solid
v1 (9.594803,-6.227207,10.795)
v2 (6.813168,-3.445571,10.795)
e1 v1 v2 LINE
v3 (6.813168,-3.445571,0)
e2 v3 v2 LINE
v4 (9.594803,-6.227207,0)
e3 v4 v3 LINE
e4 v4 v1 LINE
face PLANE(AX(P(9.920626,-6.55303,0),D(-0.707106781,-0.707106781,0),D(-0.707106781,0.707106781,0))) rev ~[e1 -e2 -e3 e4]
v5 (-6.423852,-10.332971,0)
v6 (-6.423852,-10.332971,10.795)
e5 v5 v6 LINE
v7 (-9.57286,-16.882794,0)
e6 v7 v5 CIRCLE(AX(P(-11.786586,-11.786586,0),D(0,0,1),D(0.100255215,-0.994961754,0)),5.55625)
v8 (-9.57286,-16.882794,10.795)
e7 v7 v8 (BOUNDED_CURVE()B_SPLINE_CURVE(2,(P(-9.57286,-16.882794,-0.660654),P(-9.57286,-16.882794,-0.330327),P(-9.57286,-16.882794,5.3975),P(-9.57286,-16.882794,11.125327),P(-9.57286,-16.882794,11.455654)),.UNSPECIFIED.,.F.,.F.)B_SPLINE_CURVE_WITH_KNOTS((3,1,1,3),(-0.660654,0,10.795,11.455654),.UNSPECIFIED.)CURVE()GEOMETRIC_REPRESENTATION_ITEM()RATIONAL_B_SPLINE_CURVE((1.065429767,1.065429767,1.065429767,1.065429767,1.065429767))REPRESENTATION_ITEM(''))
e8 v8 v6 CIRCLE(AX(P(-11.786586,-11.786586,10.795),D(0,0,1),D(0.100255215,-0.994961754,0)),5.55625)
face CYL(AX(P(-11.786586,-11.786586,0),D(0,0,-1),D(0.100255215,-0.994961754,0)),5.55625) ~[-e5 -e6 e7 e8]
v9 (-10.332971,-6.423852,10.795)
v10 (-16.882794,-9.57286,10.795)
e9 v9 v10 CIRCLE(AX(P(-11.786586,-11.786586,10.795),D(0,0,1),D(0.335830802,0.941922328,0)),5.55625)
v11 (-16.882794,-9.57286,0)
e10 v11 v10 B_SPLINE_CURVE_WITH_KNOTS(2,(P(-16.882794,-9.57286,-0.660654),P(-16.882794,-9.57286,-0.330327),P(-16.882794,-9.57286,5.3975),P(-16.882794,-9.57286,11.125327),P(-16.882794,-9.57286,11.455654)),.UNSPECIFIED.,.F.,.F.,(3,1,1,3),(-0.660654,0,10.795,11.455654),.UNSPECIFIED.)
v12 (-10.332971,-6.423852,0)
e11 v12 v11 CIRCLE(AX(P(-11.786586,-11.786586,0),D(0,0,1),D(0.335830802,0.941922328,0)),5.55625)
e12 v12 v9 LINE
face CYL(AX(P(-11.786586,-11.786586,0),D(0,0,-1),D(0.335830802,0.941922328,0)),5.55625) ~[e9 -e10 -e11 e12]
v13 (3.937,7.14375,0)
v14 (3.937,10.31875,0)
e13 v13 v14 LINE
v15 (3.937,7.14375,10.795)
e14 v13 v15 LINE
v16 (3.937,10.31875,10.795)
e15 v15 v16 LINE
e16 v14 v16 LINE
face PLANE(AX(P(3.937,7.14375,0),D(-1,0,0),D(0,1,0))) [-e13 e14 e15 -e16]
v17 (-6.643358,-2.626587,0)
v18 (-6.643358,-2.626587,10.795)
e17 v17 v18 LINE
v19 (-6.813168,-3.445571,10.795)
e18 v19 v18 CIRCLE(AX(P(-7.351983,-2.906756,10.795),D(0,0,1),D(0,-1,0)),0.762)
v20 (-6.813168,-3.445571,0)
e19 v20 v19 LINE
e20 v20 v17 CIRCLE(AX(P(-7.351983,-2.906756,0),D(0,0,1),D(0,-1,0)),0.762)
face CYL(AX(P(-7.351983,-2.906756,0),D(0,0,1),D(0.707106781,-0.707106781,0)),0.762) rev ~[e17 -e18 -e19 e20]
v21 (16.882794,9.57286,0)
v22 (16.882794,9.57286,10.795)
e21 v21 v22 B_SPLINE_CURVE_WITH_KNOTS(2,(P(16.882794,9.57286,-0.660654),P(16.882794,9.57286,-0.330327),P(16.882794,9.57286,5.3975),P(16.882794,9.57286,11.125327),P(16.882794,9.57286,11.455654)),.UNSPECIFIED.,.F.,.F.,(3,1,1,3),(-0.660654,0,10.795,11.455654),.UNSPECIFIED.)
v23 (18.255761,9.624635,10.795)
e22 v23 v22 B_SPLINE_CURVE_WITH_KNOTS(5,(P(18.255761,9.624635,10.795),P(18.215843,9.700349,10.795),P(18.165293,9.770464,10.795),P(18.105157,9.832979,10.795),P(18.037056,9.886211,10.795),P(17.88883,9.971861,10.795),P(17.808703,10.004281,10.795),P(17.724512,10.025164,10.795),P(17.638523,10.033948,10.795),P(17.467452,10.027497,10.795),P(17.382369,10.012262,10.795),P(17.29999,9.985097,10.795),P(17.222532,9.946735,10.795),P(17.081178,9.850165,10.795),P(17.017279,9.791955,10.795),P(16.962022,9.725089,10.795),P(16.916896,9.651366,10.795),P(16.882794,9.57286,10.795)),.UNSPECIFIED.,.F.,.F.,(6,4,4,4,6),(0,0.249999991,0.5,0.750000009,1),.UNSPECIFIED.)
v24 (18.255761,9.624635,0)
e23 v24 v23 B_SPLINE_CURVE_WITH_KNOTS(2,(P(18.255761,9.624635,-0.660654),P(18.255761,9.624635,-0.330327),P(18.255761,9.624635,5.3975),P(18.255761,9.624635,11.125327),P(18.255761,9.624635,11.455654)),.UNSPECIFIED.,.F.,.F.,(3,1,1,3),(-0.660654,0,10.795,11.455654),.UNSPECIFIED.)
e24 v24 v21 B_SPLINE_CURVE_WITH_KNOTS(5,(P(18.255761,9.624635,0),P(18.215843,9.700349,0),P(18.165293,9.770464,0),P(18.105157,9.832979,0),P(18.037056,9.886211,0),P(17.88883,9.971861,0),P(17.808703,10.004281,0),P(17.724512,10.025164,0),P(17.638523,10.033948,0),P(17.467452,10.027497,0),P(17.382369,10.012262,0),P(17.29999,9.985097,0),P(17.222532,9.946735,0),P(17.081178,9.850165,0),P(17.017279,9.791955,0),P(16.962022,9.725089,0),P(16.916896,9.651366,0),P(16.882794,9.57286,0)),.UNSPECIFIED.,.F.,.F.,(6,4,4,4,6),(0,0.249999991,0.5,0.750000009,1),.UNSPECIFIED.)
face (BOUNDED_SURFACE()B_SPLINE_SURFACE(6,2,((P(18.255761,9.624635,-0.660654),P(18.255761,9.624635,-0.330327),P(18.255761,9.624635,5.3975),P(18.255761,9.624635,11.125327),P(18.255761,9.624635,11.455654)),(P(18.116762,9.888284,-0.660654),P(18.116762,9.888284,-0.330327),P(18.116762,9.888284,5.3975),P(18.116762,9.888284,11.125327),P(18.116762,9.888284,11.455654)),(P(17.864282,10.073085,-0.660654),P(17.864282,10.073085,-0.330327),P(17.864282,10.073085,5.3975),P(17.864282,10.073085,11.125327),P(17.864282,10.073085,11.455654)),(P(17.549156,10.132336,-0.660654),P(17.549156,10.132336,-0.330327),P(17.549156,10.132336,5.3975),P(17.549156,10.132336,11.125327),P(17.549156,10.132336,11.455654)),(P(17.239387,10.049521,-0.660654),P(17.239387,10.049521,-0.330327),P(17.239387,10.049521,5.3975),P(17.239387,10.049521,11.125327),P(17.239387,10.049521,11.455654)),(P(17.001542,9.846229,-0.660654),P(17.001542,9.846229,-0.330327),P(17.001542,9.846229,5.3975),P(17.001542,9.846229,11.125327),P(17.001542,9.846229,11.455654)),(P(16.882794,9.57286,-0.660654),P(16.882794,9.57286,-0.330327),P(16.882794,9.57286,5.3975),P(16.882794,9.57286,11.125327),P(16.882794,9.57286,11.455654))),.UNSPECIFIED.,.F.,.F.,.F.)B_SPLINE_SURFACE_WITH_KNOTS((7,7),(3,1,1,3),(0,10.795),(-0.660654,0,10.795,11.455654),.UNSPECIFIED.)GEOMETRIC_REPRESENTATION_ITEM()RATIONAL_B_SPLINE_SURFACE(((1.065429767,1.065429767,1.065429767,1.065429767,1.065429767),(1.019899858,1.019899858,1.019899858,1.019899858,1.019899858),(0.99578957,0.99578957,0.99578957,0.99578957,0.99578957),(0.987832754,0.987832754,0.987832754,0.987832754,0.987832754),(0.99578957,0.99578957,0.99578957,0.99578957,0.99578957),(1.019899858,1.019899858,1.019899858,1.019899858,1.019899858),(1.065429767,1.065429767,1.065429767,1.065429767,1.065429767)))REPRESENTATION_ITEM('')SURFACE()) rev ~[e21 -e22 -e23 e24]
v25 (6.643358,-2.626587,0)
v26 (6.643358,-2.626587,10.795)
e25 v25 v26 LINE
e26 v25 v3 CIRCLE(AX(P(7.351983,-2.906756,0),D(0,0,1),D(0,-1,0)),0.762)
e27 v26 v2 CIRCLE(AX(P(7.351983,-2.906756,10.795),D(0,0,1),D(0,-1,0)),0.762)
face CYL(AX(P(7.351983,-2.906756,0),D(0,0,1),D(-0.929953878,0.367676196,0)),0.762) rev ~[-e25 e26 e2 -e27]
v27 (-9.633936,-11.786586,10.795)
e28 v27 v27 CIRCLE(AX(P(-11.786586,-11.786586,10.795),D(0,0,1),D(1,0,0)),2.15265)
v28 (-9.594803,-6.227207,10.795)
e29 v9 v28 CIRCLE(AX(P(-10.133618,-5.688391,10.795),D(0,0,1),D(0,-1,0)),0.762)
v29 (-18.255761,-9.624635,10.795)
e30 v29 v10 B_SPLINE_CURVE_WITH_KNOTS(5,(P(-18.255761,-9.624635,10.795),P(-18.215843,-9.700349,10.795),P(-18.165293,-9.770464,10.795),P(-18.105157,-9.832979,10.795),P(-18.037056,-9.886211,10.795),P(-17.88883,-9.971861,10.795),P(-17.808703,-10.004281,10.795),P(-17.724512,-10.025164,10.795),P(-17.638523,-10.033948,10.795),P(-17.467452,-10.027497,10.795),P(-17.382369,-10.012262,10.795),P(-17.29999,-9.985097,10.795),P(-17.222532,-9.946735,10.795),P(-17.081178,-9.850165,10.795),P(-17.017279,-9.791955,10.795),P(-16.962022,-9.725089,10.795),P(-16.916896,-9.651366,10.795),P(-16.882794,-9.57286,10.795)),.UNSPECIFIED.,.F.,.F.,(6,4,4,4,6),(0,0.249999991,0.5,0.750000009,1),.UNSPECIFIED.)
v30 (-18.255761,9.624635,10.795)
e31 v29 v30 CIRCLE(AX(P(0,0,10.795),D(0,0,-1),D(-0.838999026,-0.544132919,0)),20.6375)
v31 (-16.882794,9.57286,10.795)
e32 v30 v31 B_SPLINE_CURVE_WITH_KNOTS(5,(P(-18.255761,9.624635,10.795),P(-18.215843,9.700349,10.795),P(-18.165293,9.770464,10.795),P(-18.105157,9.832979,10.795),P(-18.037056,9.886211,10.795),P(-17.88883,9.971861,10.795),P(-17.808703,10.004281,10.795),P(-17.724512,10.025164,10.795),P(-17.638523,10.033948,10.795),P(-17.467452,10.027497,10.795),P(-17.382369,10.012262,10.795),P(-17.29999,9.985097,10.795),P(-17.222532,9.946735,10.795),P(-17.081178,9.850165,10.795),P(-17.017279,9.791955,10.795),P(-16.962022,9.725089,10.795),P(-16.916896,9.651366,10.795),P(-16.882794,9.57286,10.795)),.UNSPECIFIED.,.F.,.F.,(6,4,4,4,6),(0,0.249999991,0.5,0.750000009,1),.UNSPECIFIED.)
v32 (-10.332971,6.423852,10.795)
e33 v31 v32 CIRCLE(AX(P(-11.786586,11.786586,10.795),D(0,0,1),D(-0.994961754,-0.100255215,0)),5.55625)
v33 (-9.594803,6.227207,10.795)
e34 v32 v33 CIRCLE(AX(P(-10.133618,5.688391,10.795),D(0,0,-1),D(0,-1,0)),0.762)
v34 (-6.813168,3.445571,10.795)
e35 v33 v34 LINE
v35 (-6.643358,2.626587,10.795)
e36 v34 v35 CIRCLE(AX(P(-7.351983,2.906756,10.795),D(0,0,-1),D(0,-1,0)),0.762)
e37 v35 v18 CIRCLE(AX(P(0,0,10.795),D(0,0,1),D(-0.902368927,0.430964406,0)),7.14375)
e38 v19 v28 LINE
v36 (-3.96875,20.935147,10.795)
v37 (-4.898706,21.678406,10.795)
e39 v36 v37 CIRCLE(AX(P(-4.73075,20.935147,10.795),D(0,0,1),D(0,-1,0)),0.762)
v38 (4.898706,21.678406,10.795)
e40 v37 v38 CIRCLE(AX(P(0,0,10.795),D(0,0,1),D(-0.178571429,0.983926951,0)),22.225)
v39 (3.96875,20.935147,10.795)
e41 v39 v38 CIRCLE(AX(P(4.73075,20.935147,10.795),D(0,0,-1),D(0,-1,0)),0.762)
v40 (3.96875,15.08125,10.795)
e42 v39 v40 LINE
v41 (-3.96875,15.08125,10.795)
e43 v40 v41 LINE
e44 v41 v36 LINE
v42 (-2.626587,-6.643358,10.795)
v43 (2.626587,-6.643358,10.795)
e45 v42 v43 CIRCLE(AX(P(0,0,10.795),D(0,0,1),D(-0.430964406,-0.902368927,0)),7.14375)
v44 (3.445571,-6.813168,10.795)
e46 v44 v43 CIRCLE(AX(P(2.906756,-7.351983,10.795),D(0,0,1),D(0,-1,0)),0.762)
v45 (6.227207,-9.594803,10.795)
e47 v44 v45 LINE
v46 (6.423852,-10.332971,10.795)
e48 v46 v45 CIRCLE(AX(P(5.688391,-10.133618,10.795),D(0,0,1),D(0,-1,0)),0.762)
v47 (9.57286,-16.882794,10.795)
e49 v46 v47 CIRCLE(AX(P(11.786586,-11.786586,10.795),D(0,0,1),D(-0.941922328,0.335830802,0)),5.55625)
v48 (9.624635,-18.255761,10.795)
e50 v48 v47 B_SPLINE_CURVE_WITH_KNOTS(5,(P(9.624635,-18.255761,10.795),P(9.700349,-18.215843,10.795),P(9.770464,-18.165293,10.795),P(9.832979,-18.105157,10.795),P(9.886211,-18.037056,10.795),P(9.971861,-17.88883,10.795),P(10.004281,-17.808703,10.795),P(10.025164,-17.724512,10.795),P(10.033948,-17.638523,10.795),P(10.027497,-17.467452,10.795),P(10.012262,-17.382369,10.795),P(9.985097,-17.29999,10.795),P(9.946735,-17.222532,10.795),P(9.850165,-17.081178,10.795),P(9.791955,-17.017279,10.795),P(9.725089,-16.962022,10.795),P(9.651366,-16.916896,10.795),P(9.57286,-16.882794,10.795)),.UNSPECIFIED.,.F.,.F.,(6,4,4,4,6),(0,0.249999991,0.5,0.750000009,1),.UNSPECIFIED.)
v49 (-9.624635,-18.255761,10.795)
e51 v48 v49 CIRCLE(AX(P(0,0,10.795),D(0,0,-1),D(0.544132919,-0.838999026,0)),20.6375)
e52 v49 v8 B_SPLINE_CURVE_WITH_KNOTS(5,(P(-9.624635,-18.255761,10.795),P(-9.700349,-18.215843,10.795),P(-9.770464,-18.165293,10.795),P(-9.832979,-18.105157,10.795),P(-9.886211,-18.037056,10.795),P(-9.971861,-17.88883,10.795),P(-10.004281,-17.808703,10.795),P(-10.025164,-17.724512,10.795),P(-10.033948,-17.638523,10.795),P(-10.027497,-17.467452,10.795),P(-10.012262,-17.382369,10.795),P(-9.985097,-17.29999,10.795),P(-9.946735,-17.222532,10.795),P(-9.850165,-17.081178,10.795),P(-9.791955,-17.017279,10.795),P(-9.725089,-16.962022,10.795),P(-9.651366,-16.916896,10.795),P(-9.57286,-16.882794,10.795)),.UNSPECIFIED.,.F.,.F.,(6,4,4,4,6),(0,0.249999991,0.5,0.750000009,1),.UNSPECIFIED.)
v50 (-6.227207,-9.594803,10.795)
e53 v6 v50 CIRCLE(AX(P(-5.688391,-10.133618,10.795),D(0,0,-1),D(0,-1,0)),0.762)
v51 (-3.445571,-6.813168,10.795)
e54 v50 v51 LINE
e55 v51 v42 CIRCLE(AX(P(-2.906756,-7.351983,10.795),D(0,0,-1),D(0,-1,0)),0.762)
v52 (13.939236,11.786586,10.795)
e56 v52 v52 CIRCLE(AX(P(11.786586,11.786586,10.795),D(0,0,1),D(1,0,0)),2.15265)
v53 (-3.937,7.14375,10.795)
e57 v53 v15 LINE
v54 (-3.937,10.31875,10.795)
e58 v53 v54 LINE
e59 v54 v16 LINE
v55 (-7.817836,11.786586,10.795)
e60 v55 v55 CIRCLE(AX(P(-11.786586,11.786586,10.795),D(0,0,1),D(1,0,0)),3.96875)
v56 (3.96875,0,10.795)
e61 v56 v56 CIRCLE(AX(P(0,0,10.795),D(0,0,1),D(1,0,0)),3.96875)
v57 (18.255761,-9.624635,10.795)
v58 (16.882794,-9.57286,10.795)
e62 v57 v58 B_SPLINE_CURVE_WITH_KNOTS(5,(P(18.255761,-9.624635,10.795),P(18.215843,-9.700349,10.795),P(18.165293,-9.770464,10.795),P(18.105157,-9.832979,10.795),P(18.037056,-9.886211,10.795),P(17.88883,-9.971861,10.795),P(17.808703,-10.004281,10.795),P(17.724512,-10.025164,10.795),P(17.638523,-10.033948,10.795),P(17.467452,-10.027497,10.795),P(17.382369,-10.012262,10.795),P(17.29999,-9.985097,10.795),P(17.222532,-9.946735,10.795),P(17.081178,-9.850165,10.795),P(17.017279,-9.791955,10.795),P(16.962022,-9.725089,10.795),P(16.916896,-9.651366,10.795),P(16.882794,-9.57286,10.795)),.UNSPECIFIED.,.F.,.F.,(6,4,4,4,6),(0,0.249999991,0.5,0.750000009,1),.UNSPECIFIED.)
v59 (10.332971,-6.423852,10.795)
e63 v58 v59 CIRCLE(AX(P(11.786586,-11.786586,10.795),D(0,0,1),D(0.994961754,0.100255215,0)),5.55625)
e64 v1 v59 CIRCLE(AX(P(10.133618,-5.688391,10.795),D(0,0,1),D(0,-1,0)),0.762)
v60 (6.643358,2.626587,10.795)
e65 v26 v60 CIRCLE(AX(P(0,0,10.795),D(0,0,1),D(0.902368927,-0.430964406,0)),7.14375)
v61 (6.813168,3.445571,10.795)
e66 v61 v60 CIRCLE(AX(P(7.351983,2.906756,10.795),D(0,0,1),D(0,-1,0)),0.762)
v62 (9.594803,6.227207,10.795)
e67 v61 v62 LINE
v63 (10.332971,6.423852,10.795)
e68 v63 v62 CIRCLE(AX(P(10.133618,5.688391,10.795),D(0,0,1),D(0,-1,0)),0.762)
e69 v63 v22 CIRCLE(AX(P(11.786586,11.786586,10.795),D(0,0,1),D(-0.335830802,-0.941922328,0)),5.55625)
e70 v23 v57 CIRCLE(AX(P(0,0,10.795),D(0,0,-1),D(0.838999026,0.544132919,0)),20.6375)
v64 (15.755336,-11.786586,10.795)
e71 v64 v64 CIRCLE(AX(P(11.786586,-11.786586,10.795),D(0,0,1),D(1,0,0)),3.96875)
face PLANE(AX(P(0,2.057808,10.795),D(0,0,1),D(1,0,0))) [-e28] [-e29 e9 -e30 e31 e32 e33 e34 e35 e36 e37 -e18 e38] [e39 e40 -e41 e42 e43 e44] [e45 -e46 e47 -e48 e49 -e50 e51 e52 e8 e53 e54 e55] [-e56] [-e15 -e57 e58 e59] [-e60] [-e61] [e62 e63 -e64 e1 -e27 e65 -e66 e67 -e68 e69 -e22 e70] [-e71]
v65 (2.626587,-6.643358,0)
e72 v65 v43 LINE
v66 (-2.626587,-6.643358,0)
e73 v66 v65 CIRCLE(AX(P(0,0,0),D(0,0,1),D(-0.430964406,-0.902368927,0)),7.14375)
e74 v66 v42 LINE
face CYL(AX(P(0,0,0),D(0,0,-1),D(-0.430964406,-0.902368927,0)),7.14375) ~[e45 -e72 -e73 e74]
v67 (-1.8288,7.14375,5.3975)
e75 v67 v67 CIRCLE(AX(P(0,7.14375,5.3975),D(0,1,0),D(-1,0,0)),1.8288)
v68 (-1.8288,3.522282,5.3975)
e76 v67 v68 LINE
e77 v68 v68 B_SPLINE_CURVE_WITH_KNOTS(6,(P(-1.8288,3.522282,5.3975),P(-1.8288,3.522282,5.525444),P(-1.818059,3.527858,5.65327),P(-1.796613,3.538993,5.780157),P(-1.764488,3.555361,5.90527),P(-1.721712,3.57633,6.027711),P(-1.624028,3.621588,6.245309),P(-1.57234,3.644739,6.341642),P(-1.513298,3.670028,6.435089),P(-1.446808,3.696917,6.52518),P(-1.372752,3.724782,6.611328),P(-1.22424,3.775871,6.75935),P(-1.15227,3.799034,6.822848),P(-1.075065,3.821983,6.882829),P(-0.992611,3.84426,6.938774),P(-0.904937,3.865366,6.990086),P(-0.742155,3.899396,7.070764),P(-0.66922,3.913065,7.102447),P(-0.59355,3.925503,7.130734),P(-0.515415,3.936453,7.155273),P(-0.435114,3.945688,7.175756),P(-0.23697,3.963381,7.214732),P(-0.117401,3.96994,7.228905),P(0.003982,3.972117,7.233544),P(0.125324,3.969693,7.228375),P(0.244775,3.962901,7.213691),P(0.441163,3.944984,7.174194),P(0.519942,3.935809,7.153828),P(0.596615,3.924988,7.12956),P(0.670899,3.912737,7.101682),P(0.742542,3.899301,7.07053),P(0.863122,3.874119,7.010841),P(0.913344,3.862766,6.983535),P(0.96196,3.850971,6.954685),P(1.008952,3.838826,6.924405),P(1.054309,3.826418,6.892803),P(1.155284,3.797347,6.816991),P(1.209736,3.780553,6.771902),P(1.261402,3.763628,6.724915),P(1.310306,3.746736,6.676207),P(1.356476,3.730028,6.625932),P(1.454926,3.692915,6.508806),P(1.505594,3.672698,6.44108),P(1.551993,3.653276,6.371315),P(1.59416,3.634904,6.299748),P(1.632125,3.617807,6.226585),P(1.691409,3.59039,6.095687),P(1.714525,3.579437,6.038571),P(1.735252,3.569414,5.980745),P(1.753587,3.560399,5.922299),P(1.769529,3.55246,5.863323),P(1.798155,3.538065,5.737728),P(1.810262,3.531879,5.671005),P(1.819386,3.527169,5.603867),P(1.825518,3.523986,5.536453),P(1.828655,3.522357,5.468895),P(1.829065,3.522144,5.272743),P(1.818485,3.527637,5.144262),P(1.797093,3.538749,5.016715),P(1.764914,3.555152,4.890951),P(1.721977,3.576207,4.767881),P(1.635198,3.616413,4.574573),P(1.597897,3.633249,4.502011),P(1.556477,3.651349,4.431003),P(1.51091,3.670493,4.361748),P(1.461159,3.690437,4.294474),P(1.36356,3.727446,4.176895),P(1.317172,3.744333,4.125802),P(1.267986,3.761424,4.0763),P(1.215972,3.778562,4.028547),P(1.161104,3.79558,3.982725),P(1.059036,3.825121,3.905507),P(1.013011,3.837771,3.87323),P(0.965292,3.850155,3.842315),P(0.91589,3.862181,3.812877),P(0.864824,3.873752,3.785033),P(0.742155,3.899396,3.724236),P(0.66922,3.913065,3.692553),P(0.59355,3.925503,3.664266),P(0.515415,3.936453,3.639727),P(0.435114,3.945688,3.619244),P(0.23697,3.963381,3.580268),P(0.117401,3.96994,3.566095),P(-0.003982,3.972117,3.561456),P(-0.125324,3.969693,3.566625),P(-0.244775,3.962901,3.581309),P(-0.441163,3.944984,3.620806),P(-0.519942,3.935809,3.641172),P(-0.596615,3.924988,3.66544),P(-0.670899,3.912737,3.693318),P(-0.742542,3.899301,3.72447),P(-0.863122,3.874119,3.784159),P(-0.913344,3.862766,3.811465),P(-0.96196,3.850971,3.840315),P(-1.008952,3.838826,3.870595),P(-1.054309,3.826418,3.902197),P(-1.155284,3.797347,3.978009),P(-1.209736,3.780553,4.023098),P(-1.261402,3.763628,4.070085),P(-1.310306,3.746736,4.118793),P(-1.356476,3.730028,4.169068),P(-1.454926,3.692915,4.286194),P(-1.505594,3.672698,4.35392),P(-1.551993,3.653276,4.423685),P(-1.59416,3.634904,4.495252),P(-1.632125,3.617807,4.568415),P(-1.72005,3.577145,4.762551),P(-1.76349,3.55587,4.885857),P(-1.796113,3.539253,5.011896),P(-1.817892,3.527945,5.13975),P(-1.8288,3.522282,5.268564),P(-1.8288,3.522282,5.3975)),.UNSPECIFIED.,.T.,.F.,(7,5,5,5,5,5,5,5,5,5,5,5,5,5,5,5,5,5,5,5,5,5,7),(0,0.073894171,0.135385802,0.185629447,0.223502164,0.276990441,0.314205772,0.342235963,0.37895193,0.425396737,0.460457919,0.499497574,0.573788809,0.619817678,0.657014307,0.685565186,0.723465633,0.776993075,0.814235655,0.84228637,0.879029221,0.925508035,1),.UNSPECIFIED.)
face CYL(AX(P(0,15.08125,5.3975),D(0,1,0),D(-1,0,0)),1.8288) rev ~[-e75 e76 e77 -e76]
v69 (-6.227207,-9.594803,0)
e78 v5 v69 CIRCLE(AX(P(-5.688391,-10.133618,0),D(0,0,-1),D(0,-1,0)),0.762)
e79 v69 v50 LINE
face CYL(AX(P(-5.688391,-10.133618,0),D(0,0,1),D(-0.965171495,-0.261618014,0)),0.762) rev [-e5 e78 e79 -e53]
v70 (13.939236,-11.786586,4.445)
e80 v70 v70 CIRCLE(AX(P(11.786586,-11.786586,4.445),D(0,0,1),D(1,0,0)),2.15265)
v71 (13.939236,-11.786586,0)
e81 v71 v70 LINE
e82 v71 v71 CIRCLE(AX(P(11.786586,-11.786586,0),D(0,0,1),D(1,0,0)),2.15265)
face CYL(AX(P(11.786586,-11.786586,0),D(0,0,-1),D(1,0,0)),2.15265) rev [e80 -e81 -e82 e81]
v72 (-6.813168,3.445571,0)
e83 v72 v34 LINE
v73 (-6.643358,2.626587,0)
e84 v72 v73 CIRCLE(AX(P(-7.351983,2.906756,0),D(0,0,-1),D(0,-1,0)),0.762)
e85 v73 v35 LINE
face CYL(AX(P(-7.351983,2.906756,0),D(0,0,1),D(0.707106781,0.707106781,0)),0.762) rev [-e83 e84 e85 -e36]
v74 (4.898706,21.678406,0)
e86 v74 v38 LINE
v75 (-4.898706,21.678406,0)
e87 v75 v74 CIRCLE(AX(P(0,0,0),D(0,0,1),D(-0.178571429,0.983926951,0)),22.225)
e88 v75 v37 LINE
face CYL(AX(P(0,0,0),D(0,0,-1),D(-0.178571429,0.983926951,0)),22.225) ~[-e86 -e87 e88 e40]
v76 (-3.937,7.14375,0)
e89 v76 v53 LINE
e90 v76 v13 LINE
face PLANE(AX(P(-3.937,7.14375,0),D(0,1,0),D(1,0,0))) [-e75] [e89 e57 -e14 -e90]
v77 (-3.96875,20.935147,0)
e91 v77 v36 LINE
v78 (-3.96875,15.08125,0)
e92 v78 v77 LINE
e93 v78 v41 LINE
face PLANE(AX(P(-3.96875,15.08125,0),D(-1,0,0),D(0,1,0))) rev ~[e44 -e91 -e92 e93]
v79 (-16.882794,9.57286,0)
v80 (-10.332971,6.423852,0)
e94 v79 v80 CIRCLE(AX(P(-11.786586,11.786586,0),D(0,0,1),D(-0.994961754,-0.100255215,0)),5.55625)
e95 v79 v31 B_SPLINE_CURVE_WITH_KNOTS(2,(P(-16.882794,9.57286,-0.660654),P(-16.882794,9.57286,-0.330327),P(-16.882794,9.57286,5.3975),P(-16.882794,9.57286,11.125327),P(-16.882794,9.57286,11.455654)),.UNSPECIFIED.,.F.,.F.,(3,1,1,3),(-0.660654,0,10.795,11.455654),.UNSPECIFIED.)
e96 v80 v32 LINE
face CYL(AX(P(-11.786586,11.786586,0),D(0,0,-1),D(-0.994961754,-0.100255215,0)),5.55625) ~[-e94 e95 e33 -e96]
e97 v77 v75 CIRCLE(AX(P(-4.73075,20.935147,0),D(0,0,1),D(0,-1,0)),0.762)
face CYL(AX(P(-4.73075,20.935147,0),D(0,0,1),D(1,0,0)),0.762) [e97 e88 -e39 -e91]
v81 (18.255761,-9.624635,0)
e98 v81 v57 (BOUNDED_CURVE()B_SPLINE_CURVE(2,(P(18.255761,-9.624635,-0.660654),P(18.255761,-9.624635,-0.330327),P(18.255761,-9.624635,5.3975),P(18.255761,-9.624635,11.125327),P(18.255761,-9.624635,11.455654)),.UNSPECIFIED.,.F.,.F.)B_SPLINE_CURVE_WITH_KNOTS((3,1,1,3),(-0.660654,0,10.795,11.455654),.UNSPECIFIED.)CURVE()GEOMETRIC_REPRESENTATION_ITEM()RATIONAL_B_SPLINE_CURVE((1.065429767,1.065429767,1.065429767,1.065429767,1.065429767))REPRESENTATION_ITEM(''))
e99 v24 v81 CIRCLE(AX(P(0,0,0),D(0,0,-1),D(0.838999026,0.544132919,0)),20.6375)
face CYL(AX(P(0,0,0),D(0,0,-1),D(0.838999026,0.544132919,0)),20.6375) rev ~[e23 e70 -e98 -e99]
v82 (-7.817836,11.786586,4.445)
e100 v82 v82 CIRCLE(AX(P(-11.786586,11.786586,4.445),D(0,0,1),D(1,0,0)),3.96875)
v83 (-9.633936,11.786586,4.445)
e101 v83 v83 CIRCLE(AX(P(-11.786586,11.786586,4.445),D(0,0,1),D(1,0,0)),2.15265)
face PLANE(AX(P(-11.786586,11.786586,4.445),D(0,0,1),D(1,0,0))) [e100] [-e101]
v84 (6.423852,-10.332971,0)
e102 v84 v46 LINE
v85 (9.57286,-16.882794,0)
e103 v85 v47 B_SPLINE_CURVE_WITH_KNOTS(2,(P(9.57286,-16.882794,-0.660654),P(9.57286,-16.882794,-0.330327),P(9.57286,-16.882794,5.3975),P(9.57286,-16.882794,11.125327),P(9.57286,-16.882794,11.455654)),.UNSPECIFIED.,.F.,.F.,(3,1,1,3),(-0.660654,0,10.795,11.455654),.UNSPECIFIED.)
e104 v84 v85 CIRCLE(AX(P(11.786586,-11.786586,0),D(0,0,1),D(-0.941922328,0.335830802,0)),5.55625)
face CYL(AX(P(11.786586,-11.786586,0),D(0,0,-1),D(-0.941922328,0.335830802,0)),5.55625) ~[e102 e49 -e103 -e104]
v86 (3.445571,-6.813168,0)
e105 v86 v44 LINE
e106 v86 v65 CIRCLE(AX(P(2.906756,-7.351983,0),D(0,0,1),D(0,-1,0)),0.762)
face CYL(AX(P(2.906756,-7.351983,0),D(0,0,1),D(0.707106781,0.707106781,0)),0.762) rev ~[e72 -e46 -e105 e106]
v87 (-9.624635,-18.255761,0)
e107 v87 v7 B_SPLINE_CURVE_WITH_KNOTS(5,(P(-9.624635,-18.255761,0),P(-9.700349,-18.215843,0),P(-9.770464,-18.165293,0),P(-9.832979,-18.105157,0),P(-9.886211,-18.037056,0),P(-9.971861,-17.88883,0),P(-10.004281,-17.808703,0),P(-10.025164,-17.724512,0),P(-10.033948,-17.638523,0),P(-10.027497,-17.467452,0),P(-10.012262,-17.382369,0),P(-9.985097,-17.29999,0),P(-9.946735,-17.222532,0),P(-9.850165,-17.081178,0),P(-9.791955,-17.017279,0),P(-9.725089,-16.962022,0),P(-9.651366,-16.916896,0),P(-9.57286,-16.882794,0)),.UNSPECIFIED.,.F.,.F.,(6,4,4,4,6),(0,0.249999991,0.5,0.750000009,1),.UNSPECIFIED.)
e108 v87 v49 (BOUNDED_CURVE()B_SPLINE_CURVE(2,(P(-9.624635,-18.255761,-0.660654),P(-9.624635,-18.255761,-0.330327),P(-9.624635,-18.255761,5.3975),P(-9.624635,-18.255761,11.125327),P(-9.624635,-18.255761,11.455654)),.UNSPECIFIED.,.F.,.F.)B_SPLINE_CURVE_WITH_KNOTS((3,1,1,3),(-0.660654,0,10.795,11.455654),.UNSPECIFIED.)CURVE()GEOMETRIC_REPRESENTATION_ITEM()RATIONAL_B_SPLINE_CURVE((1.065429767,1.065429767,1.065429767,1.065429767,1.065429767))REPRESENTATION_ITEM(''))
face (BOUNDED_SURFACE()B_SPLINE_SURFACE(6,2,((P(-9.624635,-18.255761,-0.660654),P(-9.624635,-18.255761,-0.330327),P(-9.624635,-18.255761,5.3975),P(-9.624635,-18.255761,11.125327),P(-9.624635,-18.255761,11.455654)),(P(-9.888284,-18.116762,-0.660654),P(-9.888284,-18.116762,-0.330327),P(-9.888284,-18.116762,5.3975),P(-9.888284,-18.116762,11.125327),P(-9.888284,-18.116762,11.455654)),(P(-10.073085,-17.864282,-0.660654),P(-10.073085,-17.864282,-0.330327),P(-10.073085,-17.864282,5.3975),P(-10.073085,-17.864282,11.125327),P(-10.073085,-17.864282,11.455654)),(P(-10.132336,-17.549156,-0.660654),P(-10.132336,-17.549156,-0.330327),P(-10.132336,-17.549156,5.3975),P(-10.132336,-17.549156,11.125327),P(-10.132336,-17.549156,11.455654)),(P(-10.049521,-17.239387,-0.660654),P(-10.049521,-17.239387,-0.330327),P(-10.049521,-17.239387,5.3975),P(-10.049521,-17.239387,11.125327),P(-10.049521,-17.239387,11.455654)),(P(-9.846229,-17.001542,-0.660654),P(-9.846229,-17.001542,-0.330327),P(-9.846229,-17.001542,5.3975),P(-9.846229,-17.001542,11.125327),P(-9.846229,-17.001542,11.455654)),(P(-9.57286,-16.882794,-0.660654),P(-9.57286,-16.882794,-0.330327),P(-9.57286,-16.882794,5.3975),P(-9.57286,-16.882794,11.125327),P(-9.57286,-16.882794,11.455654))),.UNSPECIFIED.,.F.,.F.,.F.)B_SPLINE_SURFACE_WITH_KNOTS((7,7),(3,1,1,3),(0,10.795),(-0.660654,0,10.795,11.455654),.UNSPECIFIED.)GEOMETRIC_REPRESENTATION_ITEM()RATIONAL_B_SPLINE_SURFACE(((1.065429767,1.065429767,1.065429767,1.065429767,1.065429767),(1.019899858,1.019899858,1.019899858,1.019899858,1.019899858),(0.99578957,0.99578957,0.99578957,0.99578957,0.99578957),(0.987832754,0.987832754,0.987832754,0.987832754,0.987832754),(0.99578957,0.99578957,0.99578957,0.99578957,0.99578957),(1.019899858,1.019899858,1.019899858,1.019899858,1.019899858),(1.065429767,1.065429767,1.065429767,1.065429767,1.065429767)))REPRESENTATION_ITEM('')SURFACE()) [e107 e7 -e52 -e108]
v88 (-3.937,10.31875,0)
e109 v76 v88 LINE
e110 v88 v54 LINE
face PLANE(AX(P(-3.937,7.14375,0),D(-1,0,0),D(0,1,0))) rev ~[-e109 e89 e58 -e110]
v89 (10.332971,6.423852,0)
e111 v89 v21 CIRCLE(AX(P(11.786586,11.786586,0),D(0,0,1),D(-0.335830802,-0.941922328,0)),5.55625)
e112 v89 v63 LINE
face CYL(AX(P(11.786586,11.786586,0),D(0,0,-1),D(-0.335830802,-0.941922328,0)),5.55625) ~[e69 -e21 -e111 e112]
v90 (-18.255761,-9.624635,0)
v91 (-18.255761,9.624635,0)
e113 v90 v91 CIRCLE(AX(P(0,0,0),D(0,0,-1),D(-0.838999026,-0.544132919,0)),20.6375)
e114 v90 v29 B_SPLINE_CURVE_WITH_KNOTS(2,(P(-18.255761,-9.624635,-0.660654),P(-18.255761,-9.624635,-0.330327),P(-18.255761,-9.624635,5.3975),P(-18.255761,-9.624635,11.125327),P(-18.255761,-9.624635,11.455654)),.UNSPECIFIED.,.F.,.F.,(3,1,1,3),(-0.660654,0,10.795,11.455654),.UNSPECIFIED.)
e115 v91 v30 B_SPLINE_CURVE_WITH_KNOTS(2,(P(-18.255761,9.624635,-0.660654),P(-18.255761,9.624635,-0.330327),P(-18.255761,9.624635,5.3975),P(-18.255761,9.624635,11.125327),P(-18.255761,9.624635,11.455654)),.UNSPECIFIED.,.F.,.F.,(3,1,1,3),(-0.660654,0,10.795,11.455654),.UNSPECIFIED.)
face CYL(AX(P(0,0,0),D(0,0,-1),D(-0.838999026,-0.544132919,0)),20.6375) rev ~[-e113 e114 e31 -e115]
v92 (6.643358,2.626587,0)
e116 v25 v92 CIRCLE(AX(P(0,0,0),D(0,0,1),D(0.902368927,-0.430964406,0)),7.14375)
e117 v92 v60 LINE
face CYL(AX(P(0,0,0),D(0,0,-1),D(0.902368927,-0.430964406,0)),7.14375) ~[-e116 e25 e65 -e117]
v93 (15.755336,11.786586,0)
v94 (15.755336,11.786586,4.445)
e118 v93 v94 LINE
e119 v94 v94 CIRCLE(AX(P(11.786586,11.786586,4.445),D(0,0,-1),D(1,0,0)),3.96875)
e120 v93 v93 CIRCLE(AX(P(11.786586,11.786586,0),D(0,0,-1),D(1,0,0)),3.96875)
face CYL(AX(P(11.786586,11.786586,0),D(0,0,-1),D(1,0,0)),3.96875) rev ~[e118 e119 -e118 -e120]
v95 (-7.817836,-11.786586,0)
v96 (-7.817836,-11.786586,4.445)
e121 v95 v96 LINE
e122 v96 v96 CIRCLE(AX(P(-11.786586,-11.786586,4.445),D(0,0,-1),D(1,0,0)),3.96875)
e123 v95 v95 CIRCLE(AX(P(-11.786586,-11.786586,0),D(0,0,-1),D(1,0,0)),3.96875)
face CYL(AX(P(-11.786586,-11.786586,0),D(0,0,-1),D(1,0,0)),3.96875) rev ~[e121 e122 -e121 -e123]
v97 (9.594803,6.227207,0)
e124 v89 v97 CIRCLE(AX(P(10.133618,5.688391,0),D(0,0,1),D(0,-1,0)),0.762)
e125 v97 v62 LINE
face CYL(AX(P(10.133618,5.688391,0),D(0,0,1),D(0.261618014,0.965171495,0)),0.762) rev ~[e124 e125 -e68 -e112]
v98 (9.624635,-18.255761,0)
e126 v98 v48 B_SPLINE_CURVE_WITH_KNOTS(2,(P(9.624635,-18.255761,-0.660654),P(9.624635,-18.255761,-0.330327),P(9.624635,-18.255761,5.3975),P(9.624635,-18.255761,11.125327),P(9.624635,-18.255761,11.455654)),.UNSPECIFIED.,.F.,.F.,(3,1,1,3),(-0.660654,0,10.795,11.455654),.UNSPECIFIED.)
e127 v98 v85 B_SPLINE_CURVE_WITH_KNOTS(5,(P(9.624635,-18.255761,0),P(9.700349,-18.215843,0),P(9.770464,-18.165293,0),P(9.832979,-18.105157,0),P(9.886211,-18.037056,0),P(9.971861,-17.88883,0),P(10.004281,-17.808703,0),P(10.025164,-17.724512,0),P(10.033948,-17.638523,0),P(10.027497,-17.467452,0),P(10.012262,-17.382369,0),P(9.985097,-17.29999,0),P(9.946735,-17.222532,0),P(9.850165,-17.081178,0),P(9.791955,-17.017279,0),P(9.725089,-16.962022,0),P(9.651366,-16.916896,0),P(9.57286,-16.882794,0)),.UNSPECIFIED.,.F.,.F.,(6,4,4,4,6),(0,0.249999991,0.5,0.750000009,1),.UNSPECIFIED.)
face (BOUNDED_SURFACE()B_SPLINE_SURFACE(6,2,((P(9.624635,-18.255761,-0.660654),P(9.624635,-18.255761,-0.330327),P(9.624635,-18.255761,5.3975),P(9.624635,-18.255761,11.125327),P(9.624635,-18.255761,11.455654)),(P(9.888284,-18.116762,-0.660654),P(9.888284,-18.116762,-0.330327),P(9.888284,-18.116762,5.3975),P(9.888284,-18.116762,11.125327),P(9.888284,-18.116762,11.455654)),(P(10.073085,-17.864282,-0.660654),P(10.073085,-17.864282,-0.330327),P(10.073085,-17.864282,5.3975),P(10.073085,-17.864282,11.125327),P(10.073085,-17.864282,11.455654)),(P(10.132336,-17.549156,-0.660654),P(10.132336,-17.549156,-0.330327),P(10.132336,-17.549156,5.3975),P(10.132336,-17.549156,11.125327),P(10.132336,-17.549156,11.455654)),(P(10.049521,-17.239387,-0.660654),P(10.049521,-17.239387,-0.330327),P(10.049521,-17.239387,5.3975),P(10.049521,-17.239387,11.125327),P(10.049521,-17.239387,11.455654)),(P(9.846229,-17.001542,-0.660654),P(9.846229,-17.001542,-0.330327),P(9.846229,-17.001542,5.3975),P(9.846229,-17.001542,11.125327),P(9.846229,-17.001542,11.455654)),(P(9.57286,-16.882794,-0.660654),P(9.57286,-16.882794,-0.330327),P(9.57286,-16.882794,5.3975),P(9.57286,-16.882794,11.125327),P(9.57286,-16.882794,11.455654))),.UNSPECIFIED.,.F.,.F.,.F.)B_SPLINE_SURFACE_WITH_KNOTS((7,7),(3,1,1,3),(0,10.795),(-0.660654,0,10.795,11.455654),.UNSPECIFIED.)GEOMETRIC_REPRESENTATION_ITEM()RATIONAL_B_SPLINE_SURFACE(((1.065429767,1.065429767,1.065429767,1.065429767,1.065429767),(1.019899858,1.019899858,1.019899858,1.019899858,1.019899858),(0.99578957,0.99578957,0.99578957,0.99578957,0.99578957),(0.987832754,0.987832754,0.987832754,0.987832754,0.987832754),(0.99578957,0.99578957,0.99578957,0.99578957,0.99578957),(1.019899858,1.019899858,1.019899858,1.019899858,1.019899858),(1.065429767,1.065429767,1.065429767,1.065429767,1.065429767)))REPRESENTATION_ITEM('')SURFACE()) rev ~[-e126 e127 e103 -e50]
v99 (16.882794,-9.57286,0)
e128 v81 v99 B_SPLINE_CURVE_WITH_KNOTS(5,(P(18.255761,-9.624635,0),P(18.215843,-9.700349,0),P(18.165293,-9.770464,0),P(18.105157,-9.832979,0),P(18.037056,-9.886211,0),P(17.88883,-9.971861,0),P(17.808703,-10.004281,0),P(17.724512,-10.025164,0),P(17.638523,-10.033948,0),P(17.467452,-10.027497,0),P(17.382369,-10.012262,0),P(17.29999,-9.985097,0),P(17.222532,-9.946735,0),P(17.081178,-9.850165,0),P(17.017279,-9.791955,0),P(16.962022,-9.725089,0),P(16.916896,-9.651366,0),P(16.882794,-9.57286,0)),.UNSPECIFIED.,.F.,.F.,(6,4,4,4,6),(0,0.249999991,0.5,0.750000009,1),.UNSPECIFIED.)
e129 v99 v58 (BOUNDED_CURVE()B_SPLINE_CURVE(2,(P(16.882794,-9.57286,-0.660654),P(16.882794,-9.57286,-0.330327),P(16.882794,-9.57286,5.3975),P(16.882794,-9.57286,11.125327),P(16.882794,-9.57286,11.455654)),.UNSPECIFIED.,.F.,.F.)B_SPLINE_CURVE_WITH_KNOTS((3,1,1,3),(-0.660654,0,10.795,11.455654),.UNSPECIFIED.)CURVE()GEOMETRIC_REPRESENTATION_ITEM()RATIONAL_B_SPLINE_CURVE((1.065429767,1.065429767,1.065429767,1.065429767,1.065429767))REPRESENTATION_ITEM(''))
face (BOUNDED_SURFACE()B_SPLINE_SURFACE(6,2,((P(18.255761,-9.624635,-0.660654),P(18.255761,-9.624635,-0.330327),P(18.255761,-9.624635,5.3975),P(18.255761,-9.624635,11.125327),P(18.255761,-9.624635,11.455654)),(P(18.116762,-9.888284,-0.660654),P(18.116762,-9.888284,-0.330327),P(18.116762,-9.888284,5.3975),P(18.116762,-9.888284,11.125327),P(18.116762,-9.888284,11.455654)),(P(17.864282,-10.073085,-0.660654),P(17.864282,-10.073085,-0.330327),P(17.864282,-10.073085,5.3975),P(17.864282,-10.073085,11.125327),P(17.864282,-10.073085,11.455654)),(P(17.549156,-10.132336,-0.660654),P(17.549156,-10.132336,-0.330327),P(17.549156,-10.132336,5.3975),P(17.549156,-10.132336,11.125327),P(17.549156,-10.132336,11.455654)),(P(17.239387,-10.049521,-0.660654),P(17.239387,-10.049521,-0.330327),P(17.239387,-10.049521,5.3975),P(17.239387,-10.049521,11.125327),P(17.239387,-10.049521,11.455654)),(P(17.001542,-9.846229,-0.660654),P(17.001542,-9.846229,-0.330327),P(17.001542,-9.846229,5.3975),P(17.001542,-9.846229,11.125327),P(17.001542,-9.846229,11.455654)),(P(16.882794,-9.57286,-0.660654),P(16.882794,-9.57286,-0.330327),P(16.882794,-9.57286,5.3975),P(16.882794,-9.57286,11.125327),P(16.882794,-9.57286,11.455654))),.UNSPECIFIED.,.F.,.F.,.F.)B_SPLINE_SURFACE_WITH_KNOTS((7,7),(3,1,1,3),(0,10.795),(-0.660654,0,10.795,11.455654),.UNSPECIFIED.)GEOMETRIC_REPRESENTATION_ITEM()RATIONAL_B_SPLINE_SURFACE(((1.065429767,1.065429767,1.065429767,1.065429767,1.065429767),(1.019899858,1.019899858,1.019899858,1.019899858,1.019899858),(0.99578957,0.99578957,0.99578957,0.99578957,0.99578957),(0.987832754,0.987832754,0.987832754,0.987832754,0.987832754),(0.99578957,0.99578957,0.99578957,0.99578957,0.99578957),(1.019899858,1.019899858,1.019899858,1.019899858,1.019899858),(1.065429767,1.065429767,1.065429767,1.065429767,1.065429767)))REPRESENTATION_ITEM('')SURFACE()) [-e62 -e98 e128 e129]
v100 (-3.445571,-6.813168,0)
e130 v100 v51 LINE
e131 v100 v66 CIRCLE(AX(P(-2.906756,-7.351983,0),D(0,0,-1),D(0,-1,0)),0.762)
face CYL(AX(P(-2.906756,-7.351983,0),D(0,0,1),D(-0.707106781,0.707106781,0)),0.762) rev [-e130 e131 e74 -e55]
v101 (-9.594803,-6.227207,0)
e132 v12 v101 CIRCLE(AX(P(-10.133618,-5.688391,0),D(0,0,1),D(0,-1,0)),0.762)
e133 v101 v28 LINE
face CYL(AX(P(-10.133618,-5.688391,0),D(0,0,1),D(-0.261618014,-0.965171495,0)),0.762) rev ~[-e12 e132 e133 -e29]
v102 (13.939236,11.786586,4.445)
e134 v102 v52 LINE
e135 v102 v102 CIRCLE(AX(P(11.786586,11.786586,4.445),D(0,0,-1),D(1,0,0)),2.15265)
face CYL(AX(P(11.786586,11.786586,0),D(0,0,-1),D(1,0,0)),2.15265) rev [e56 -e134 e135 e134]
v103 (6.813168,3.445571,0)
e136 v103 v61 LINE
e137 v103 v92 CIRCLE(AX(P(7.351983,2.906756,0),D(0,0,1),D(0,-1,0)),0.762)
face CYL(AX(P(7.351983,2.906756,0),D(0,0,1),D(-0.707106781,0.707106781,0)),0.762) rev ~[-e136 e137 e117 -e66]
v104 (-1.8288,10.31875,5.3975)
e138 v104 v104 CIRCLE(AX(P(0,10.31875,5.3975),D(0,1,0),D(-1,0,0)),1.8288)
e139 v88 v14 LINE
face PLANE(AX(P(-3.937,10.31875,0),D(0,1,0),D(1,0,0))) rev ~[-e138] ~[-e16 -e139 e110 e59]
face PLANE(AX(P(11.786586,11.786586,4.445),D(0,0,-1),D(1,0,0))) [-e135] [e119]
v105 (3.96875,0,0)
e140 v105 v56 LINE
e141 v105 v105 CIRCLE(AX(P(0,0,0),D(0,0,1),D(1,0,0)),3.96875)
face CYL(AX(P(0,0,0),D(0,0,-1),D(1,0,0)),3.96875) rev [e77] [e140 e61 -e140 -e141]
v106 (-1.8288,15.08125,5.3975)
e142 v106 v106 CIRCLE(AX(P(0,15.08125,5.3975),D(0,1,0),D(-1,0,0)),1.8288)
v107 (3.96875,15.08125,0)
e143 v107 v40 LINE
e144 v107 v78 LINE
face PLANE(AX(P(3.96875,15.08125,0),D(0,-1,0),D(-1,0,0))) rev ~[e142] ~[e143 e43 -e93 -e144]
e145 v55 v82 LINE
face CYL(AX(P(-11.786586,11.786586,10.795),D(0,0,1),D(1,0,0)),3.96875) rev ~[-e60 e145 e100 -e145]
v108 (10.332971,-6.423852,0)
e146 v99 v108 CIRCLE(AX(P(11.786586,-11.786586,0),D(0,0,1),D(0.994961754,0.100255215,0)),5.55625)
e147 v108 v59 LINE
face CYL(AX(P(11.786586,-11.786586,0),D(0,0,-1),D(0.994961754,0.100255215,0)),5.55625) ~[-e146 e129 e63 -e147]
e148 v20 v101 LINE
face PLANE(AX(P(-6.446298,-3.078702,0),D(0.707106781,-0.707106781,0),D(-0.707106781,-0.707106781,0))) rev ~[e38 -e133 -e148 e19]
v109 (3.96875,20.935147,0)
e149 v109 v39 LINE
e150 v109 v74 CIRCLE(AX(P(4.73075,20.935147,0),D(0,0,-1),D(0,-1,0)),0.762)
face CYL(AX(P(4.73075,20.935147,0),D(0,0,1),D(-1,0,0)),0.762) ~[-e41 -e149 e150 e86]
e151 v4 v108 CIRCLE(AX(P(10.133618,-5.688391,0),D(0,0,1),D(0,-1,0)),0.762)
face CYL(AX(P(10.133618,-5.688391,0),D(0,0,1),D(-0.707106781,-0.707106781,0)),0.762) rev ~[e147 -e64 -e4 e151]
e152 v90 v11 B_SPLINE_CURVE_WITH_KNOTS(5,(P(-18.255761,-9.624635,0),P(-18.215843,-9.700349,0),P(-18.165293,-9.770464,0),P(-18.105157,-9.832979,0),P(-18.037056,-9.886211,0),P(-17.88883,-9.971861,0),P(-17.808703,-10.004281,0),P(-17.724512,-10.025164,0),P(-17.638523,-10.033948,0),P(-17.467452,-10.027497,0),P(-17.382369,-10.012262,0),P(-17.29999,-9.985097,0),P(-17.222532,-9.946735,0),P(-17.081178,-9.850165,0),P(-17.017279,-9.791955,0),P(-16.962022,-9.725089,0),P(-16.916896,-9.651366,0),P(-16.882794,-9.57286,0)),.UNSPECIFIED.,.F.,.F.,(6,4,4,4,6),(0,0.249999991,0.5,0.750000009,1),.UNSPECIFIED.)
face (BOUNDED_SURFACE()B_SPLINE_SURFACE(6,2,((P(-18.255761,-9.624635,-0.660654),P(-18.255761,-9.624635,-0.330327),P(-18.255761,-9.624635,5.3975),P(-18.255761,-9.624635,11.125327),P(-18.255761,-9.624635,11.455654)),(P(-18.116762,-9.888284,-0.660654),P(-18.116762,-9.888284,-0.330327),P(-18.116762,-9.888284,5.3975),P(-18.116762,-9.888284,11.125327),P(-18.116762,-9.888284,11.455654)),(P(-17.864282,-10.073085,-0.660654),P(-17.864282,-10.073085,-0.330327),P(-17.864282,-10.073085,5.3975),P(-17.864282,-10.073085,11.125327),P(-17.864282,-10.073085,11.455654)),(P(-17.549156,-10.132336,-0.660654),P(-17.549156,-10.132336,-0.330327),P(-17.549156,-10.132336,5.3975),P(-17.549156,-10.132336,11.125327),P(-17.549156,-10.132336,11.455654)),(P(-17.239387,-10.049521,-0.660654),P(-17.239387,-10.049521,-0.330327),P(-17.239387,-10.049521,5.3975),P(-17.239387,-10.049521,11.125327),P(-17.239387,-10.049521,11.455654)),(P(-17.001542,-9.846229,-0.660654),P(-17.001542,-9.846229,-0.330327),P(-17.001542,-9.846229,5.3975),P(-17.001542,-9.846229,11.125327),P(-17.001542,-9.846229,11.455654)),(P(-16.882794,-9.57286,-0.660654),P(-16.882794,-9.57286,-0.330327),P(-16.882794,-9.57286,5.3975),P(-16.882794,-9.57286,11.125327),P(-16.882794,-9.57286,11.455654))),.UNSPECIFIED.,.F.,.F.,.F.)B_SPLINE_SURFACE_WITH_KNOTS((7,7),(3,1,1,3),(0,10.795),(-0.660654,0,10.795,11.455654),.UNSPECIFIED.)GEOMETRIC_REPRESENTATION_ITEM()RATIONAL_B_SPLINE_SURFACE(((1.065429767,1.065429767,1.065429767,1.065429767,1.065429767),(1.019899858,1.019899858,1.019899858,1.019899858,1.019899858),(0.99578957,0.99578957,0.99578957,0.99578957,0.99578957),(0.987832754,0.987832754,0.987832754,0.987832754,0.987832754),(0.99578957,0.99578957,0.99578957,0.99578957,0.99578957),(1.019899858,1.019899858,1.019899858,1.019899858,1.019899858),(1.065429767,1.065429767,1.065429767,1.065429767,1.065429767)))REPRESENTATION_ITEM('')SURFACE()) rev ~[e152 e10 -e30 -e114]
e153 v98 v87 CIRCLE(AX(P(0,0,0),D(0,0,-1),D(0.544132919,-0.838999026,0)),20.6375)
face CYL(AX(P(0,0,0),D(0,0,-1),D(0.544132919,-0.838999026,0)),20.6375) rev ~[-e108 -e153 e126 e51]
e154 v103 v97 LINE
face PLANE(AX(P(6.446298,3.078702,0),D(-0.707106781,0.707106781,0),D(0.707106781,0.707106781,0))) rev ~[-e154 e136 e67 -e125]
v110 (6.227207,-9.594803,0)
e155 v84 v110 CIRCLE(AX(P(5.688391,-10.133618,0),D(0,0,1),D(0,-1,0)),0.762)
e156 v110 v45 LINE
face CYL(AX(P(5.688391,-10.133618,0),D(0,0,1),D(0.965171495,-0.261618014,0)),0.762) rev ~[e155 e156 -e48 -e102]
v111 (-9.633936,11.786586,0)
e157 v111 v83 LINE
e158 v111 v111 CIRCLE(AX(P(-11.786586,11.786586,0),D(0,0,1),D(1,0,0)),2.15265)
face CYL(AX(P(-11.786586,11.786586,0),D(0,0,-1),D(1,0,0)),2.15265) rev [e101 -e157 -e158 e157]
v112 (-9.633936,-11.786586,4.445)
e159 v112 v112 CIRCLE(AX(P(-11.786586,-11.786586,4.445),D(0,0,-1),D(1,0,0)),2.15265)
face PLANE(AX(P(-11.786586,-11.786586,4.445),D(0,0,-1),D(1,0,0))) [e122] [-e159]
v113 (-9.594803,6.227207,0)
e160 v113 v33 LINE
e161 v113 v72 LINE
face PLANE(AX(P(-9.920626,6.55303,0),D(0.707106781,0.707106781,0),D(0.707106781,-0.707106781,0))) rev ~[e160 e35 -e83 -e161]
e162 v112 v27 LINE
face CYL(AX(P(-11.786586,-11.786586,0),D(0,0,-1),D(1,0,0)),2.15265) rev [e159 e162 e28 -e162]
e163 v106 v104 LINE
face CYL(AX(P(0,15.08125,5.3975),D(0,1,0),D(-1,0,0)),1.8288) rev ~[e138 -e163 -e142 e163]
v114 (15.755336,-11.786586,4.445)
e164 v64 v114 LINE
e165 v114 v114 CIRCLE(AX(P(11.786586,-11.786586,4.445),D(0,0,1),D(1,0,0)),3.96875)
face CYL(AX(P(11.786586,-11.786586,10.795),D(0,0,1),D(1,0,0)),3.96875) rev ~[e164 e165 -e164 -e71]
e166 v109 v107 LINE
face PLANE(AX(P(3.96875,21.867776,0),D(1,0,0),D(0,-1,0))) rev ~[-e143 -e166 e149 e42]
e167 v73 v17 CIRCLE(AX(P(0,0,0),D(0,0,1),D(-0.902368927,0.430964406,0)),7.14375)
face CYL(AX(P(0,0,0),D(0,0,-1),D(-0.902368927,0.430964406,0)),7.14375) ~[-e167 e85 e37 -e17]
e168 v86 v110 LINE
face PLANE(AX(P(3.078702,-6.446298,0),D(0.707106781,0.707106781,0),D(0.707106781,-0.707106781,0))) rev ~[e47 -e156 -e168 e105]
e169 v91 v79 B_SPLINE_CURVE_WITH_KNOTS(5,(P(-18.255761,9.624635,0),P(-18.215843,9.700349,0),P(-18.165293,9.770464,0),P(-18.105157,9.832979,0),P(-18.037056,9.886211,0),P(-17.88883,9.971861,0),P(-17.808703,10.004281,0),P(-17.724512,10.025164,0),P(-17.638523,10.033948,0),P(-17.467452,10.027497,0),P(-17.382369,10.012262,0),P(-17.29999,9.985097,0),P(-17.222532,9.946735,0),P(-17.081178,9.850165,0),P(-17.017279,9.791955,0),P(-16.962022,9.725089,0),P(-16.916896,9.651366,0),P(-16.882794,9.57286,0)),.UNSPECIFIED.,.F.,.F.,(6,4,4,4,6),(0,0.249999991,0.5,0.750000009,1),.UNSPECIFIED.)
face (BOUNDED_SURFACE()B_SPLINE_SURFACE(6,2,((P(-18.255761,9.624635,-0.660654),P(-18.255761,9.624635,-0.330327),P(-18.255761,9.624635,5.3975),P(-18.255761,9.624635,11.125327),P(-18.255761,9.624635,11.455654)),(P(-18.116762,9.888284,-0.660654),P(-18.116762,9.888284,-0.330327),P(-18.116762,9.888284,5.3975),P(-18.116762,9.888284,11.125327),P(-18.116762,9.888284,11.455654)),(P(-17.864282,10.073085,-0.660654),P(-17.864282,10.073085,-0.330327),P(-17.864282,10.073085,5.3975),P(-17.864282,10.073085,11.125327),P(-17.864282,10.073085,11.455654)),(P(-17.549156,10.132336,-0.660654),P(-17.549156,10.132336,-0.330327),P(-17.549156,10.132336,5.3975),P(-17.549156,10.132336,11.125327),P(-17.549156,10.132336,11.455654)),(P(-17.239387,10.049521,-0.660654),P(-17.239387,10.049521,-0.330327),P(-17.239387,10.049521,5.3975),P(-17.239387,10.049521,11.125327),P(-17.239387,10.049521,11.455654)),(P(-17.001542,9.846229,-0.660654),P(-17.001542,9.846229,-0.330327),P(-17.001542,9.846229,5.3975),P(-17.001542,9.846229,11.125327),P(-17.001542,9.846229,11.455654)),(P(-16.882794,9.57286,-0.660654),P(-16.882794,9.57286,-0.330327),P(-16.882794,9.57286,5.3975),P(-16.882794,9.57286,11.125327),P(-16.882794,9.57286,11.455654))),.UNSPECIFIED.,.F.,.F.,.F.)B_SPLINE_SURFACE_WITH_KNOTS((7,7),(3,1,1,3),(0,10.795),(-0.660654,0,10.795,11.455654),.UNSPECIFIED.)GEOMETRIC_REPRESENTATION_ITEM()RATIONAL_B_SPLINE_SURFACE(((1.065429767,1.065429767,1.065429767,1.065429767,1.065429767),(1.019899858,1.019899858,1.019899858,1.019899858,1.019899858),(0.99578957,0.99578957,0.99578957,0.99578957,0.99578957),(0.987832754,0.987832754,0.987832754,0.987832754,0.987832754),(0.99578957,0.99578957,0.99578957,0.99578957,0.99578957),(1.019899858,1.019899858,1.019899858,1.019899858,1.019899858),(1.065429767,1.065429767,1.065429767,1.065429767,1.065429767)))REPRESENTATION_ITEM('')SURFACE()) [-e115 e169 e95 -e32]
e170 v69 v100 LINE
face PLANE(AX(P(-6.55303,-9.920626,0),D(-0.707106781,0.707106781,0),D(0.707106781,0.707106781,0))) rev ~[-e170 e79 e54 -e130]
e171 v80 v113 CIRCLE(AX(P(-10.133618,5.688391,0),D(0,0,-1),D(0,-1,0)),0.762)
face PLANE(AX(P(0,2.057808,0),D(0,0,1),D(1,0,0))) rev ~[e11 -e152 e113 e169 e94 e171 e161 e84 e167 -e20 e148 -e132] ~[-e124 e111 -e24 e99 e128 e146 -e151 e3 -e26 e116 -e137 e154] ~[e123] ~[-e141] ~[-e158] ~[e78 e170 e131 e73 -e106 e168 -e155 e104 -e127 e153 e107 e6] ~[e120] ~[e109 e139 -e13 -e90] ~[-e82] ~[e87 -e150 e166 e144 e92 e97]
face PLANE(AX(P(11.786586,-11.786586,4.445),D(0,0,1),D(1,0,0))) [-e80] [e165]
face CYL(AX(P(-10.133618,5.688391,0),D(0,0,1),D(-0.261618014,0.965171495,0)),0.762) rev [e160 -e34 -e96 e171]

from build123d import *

# Parameters (mm, degrees)
F0_R            = 2.15265
F0_R_2          = 3.96875
F0_W            = 7.874
F0_H            = 3.175
F1_DEPTH        = 10.795
F2_R            = 1.8288
F3_REACH        = 42.4798775257
F5_R            = 3.96875
F6_DEPTH        = 4.445
F8_DEPTH        = 10.795
F8_COPIES_COUNT = 3
F8_COPIES_ANGLE = 180
F9_R            = 0.762
F11_R           = 3.96875
F11_R_2         = 2.15265
F13_DEPTH       = 6.35


# Not quite as in the source:
# - a feature of the source that left no trace in its solid (it failed there, or was rolled back) is left out
# - a pattern or mirror of a feature is missing from the dataset's text; its kind, count and spacing are read off the source's solid


with BuildPart() as f1:
    # F0 (on Top) → F1 (new body)
    with BuildSketch(Plane.XY):
        with BuildLine():
            Line((3.96875, 15.08125), (-3.96875, 15.08125))
            Line((-3.96875, 15.08125), (-3.96875, 21.8677764859))
            ThreePointArc((-3.96875, 21.8677764859), (0, -22.225), (3.96875, 21.8677764859))
            Line((3.96875, 21.8677764859), (3.96875, 15.08125))
        make_face()
        with Locations((-11.7865861589, -11.7865861589)):
            Circle(F0_R, mode=Mode.SUBTRACT)
        with Locations((11.7865861589, -11.7865861589)):
            Circle(F0_R, mode=Mode.SUBTRACT)
        with Locations((-11.7865861589, 11.7865861589)):
            Circle(F0_R, mode=Mode.SUBTRACT)
        Circle(F0_R_2, mode=Mode.SUBTRACT)
        with Locations((0, 8.73125)):
            Rectangle(F0_W, F0_H, mode=Mode.SUBTRACT)
        with Locations((11.7865861589, 11.7865861589)):
            Circle(F0_R, mode=Mode.SUBTRACT)
    extrude(amount=F1_DEPTH)

    f3_end = f1.faces().sort_by_distance((-3.96875, 0, 5.3975))[0]
    # F2 (on face) → F3 (cut, up to a face of the model that its end follows)
    with BuildSketch(Plane(origin=(0, 15.08125, 0), x_dir=(-1, 0, 0), z_dir=(0, 1, 0))):
        with Locations((0, 5.3975)):
            Circle(F2_R)
    f3_long = extrude(amount=-F3_REACH, mode=Mode.PRIVATE)
    add(split(f3_long, bisect_by=f3_end, keep=Keep.ALL, mode=Mode.PRIVATE).solids().sort_by_distance((0, 15.08125, 5.3975))[0], mode=Mode.SUBTRACT)

    # F5 (on face) → F6 (cut, through all)
    with BuildSketch(Plane(origin=(0, 0, 0), x_dir=(1, 0, 0), z_dir=(0, 0, -1))):
        with Locations((11.7865861589, -11.7865861589)):
            Circle(F5_R)
        with Locations((-11.7865861589, 11.7865861589)):
            Circle(F5_R)
    extrude(amount=-F6_DEPTH, mode=Mode.SUBTRACT)

    # F7 (on face) → F8 (cut, through all)
    with BuildSketch(Plane(origin=(0, 0, 0), x_dir=(1, 0, 0), z_dir=(0, 0, -1))):
        with BuildLine():
            ThreePointArc((-17.3148424047, -11.229543123), (-14.7565267097, -7.0906978311), (-9.9206262673, -6.5530302219))
            Line((-9.9206262673, -6.5530302219), (-6.4462980227, -3.0787019773))
            ThreePointArc((-6.4462980227, -3.0787019773), (-7.14375, 0), (-6.4462980227, 3.0787019773))
            Line((-6.4462980227, 3.0787019773), (-9.9206262673, 6.5530302219))
            ThreePointArc((-9.9206262673, 6.5530302219), (-14.7565267097, 7.0906978311), (-17.3148424047, 11.229543123))
            ThreePointArc((-17.3148424047, 11.229543123), (-20.6375, 0), (-17.3148424047, -11.229543123))
        make_face()
    f8 = extrude(amount=-F8_DEPTH, mode=Mode.SUBTRACT)

    # F8_copies: F8 ×3 about axis
    f8_copies_axis = Axis((0, 0, 0), (0, 0, 1))
    for i in range(1, F8_COPIES_COUNT):
        add(f8.rotate(f8_copies_axis, i * F8_COPIES_ANGLE / (F8_COPIES_COUNT - 1)), mode=Mode.SUBTRACT)

    # F9
    f9_edges = [f1.edges().sort_by_distance(p)[0] for p in [
        (-17.314842, -11.229543, 5.3975),
        (-9.920626, -6.55303, 5.3975),
        (-6.446298, -3.078702, 5.3975),
        (-6.446298, 3.078702, 5.3975),
        (-9.920626, 6.55303, 5.3975),
        (-17.314842, 11.229543, 5.3975),
        (3.96875, 21.867776, 5.3975),
        (-3.96875, 21.867776, 5.3975),
        (11.229543, -17.314842, 5.3975),
        (-11.229543, -17.314842, 5.3975),
        (6.55303, -9.920626, 5.3975),
        (-6.55303, -9.920626, 5.3975),
        (3.078702, -6.446298, 5.3975),
        (-3.078702, -6.446298, 5.3975),
        (17.314842, 11.229543, 5.3975),
        (17.314842, -11.229543, 5.3975),
        (9.920626, 6.55303, 5.3975),
        (6.446298, 3.078702, 5.3975),
        (6.446298, -3.078702, 5.3975),
        (9.920626, -6.55303, 5.3975),
    ]]
    fillet(f9_edges, radius=F9_R)

    # F11 (on face) → F13 (cut, through all)
    with BuildSketch(Plane.XY.offset(10.795)):
        with Locations((-11.7865861589, 11.7865861589)):
            Circle(F11_R)
        with Locations((-11.7865861589, 11.7865861589)):
            Circle(F11_R_2, mode=Mode.SUBTRACT)
        with Locations((11.7865861589, -11.7865861589)):
            Circle(F11_R)
        with Locations((11.7865861589, -11.7865861589)):
            Circle(F11_R_2, mode=Mode.SUBTRACT)
    extrude(amount=-F13_DEPTH, mode=Mode.SUBTRACT)


solid = f1.part
